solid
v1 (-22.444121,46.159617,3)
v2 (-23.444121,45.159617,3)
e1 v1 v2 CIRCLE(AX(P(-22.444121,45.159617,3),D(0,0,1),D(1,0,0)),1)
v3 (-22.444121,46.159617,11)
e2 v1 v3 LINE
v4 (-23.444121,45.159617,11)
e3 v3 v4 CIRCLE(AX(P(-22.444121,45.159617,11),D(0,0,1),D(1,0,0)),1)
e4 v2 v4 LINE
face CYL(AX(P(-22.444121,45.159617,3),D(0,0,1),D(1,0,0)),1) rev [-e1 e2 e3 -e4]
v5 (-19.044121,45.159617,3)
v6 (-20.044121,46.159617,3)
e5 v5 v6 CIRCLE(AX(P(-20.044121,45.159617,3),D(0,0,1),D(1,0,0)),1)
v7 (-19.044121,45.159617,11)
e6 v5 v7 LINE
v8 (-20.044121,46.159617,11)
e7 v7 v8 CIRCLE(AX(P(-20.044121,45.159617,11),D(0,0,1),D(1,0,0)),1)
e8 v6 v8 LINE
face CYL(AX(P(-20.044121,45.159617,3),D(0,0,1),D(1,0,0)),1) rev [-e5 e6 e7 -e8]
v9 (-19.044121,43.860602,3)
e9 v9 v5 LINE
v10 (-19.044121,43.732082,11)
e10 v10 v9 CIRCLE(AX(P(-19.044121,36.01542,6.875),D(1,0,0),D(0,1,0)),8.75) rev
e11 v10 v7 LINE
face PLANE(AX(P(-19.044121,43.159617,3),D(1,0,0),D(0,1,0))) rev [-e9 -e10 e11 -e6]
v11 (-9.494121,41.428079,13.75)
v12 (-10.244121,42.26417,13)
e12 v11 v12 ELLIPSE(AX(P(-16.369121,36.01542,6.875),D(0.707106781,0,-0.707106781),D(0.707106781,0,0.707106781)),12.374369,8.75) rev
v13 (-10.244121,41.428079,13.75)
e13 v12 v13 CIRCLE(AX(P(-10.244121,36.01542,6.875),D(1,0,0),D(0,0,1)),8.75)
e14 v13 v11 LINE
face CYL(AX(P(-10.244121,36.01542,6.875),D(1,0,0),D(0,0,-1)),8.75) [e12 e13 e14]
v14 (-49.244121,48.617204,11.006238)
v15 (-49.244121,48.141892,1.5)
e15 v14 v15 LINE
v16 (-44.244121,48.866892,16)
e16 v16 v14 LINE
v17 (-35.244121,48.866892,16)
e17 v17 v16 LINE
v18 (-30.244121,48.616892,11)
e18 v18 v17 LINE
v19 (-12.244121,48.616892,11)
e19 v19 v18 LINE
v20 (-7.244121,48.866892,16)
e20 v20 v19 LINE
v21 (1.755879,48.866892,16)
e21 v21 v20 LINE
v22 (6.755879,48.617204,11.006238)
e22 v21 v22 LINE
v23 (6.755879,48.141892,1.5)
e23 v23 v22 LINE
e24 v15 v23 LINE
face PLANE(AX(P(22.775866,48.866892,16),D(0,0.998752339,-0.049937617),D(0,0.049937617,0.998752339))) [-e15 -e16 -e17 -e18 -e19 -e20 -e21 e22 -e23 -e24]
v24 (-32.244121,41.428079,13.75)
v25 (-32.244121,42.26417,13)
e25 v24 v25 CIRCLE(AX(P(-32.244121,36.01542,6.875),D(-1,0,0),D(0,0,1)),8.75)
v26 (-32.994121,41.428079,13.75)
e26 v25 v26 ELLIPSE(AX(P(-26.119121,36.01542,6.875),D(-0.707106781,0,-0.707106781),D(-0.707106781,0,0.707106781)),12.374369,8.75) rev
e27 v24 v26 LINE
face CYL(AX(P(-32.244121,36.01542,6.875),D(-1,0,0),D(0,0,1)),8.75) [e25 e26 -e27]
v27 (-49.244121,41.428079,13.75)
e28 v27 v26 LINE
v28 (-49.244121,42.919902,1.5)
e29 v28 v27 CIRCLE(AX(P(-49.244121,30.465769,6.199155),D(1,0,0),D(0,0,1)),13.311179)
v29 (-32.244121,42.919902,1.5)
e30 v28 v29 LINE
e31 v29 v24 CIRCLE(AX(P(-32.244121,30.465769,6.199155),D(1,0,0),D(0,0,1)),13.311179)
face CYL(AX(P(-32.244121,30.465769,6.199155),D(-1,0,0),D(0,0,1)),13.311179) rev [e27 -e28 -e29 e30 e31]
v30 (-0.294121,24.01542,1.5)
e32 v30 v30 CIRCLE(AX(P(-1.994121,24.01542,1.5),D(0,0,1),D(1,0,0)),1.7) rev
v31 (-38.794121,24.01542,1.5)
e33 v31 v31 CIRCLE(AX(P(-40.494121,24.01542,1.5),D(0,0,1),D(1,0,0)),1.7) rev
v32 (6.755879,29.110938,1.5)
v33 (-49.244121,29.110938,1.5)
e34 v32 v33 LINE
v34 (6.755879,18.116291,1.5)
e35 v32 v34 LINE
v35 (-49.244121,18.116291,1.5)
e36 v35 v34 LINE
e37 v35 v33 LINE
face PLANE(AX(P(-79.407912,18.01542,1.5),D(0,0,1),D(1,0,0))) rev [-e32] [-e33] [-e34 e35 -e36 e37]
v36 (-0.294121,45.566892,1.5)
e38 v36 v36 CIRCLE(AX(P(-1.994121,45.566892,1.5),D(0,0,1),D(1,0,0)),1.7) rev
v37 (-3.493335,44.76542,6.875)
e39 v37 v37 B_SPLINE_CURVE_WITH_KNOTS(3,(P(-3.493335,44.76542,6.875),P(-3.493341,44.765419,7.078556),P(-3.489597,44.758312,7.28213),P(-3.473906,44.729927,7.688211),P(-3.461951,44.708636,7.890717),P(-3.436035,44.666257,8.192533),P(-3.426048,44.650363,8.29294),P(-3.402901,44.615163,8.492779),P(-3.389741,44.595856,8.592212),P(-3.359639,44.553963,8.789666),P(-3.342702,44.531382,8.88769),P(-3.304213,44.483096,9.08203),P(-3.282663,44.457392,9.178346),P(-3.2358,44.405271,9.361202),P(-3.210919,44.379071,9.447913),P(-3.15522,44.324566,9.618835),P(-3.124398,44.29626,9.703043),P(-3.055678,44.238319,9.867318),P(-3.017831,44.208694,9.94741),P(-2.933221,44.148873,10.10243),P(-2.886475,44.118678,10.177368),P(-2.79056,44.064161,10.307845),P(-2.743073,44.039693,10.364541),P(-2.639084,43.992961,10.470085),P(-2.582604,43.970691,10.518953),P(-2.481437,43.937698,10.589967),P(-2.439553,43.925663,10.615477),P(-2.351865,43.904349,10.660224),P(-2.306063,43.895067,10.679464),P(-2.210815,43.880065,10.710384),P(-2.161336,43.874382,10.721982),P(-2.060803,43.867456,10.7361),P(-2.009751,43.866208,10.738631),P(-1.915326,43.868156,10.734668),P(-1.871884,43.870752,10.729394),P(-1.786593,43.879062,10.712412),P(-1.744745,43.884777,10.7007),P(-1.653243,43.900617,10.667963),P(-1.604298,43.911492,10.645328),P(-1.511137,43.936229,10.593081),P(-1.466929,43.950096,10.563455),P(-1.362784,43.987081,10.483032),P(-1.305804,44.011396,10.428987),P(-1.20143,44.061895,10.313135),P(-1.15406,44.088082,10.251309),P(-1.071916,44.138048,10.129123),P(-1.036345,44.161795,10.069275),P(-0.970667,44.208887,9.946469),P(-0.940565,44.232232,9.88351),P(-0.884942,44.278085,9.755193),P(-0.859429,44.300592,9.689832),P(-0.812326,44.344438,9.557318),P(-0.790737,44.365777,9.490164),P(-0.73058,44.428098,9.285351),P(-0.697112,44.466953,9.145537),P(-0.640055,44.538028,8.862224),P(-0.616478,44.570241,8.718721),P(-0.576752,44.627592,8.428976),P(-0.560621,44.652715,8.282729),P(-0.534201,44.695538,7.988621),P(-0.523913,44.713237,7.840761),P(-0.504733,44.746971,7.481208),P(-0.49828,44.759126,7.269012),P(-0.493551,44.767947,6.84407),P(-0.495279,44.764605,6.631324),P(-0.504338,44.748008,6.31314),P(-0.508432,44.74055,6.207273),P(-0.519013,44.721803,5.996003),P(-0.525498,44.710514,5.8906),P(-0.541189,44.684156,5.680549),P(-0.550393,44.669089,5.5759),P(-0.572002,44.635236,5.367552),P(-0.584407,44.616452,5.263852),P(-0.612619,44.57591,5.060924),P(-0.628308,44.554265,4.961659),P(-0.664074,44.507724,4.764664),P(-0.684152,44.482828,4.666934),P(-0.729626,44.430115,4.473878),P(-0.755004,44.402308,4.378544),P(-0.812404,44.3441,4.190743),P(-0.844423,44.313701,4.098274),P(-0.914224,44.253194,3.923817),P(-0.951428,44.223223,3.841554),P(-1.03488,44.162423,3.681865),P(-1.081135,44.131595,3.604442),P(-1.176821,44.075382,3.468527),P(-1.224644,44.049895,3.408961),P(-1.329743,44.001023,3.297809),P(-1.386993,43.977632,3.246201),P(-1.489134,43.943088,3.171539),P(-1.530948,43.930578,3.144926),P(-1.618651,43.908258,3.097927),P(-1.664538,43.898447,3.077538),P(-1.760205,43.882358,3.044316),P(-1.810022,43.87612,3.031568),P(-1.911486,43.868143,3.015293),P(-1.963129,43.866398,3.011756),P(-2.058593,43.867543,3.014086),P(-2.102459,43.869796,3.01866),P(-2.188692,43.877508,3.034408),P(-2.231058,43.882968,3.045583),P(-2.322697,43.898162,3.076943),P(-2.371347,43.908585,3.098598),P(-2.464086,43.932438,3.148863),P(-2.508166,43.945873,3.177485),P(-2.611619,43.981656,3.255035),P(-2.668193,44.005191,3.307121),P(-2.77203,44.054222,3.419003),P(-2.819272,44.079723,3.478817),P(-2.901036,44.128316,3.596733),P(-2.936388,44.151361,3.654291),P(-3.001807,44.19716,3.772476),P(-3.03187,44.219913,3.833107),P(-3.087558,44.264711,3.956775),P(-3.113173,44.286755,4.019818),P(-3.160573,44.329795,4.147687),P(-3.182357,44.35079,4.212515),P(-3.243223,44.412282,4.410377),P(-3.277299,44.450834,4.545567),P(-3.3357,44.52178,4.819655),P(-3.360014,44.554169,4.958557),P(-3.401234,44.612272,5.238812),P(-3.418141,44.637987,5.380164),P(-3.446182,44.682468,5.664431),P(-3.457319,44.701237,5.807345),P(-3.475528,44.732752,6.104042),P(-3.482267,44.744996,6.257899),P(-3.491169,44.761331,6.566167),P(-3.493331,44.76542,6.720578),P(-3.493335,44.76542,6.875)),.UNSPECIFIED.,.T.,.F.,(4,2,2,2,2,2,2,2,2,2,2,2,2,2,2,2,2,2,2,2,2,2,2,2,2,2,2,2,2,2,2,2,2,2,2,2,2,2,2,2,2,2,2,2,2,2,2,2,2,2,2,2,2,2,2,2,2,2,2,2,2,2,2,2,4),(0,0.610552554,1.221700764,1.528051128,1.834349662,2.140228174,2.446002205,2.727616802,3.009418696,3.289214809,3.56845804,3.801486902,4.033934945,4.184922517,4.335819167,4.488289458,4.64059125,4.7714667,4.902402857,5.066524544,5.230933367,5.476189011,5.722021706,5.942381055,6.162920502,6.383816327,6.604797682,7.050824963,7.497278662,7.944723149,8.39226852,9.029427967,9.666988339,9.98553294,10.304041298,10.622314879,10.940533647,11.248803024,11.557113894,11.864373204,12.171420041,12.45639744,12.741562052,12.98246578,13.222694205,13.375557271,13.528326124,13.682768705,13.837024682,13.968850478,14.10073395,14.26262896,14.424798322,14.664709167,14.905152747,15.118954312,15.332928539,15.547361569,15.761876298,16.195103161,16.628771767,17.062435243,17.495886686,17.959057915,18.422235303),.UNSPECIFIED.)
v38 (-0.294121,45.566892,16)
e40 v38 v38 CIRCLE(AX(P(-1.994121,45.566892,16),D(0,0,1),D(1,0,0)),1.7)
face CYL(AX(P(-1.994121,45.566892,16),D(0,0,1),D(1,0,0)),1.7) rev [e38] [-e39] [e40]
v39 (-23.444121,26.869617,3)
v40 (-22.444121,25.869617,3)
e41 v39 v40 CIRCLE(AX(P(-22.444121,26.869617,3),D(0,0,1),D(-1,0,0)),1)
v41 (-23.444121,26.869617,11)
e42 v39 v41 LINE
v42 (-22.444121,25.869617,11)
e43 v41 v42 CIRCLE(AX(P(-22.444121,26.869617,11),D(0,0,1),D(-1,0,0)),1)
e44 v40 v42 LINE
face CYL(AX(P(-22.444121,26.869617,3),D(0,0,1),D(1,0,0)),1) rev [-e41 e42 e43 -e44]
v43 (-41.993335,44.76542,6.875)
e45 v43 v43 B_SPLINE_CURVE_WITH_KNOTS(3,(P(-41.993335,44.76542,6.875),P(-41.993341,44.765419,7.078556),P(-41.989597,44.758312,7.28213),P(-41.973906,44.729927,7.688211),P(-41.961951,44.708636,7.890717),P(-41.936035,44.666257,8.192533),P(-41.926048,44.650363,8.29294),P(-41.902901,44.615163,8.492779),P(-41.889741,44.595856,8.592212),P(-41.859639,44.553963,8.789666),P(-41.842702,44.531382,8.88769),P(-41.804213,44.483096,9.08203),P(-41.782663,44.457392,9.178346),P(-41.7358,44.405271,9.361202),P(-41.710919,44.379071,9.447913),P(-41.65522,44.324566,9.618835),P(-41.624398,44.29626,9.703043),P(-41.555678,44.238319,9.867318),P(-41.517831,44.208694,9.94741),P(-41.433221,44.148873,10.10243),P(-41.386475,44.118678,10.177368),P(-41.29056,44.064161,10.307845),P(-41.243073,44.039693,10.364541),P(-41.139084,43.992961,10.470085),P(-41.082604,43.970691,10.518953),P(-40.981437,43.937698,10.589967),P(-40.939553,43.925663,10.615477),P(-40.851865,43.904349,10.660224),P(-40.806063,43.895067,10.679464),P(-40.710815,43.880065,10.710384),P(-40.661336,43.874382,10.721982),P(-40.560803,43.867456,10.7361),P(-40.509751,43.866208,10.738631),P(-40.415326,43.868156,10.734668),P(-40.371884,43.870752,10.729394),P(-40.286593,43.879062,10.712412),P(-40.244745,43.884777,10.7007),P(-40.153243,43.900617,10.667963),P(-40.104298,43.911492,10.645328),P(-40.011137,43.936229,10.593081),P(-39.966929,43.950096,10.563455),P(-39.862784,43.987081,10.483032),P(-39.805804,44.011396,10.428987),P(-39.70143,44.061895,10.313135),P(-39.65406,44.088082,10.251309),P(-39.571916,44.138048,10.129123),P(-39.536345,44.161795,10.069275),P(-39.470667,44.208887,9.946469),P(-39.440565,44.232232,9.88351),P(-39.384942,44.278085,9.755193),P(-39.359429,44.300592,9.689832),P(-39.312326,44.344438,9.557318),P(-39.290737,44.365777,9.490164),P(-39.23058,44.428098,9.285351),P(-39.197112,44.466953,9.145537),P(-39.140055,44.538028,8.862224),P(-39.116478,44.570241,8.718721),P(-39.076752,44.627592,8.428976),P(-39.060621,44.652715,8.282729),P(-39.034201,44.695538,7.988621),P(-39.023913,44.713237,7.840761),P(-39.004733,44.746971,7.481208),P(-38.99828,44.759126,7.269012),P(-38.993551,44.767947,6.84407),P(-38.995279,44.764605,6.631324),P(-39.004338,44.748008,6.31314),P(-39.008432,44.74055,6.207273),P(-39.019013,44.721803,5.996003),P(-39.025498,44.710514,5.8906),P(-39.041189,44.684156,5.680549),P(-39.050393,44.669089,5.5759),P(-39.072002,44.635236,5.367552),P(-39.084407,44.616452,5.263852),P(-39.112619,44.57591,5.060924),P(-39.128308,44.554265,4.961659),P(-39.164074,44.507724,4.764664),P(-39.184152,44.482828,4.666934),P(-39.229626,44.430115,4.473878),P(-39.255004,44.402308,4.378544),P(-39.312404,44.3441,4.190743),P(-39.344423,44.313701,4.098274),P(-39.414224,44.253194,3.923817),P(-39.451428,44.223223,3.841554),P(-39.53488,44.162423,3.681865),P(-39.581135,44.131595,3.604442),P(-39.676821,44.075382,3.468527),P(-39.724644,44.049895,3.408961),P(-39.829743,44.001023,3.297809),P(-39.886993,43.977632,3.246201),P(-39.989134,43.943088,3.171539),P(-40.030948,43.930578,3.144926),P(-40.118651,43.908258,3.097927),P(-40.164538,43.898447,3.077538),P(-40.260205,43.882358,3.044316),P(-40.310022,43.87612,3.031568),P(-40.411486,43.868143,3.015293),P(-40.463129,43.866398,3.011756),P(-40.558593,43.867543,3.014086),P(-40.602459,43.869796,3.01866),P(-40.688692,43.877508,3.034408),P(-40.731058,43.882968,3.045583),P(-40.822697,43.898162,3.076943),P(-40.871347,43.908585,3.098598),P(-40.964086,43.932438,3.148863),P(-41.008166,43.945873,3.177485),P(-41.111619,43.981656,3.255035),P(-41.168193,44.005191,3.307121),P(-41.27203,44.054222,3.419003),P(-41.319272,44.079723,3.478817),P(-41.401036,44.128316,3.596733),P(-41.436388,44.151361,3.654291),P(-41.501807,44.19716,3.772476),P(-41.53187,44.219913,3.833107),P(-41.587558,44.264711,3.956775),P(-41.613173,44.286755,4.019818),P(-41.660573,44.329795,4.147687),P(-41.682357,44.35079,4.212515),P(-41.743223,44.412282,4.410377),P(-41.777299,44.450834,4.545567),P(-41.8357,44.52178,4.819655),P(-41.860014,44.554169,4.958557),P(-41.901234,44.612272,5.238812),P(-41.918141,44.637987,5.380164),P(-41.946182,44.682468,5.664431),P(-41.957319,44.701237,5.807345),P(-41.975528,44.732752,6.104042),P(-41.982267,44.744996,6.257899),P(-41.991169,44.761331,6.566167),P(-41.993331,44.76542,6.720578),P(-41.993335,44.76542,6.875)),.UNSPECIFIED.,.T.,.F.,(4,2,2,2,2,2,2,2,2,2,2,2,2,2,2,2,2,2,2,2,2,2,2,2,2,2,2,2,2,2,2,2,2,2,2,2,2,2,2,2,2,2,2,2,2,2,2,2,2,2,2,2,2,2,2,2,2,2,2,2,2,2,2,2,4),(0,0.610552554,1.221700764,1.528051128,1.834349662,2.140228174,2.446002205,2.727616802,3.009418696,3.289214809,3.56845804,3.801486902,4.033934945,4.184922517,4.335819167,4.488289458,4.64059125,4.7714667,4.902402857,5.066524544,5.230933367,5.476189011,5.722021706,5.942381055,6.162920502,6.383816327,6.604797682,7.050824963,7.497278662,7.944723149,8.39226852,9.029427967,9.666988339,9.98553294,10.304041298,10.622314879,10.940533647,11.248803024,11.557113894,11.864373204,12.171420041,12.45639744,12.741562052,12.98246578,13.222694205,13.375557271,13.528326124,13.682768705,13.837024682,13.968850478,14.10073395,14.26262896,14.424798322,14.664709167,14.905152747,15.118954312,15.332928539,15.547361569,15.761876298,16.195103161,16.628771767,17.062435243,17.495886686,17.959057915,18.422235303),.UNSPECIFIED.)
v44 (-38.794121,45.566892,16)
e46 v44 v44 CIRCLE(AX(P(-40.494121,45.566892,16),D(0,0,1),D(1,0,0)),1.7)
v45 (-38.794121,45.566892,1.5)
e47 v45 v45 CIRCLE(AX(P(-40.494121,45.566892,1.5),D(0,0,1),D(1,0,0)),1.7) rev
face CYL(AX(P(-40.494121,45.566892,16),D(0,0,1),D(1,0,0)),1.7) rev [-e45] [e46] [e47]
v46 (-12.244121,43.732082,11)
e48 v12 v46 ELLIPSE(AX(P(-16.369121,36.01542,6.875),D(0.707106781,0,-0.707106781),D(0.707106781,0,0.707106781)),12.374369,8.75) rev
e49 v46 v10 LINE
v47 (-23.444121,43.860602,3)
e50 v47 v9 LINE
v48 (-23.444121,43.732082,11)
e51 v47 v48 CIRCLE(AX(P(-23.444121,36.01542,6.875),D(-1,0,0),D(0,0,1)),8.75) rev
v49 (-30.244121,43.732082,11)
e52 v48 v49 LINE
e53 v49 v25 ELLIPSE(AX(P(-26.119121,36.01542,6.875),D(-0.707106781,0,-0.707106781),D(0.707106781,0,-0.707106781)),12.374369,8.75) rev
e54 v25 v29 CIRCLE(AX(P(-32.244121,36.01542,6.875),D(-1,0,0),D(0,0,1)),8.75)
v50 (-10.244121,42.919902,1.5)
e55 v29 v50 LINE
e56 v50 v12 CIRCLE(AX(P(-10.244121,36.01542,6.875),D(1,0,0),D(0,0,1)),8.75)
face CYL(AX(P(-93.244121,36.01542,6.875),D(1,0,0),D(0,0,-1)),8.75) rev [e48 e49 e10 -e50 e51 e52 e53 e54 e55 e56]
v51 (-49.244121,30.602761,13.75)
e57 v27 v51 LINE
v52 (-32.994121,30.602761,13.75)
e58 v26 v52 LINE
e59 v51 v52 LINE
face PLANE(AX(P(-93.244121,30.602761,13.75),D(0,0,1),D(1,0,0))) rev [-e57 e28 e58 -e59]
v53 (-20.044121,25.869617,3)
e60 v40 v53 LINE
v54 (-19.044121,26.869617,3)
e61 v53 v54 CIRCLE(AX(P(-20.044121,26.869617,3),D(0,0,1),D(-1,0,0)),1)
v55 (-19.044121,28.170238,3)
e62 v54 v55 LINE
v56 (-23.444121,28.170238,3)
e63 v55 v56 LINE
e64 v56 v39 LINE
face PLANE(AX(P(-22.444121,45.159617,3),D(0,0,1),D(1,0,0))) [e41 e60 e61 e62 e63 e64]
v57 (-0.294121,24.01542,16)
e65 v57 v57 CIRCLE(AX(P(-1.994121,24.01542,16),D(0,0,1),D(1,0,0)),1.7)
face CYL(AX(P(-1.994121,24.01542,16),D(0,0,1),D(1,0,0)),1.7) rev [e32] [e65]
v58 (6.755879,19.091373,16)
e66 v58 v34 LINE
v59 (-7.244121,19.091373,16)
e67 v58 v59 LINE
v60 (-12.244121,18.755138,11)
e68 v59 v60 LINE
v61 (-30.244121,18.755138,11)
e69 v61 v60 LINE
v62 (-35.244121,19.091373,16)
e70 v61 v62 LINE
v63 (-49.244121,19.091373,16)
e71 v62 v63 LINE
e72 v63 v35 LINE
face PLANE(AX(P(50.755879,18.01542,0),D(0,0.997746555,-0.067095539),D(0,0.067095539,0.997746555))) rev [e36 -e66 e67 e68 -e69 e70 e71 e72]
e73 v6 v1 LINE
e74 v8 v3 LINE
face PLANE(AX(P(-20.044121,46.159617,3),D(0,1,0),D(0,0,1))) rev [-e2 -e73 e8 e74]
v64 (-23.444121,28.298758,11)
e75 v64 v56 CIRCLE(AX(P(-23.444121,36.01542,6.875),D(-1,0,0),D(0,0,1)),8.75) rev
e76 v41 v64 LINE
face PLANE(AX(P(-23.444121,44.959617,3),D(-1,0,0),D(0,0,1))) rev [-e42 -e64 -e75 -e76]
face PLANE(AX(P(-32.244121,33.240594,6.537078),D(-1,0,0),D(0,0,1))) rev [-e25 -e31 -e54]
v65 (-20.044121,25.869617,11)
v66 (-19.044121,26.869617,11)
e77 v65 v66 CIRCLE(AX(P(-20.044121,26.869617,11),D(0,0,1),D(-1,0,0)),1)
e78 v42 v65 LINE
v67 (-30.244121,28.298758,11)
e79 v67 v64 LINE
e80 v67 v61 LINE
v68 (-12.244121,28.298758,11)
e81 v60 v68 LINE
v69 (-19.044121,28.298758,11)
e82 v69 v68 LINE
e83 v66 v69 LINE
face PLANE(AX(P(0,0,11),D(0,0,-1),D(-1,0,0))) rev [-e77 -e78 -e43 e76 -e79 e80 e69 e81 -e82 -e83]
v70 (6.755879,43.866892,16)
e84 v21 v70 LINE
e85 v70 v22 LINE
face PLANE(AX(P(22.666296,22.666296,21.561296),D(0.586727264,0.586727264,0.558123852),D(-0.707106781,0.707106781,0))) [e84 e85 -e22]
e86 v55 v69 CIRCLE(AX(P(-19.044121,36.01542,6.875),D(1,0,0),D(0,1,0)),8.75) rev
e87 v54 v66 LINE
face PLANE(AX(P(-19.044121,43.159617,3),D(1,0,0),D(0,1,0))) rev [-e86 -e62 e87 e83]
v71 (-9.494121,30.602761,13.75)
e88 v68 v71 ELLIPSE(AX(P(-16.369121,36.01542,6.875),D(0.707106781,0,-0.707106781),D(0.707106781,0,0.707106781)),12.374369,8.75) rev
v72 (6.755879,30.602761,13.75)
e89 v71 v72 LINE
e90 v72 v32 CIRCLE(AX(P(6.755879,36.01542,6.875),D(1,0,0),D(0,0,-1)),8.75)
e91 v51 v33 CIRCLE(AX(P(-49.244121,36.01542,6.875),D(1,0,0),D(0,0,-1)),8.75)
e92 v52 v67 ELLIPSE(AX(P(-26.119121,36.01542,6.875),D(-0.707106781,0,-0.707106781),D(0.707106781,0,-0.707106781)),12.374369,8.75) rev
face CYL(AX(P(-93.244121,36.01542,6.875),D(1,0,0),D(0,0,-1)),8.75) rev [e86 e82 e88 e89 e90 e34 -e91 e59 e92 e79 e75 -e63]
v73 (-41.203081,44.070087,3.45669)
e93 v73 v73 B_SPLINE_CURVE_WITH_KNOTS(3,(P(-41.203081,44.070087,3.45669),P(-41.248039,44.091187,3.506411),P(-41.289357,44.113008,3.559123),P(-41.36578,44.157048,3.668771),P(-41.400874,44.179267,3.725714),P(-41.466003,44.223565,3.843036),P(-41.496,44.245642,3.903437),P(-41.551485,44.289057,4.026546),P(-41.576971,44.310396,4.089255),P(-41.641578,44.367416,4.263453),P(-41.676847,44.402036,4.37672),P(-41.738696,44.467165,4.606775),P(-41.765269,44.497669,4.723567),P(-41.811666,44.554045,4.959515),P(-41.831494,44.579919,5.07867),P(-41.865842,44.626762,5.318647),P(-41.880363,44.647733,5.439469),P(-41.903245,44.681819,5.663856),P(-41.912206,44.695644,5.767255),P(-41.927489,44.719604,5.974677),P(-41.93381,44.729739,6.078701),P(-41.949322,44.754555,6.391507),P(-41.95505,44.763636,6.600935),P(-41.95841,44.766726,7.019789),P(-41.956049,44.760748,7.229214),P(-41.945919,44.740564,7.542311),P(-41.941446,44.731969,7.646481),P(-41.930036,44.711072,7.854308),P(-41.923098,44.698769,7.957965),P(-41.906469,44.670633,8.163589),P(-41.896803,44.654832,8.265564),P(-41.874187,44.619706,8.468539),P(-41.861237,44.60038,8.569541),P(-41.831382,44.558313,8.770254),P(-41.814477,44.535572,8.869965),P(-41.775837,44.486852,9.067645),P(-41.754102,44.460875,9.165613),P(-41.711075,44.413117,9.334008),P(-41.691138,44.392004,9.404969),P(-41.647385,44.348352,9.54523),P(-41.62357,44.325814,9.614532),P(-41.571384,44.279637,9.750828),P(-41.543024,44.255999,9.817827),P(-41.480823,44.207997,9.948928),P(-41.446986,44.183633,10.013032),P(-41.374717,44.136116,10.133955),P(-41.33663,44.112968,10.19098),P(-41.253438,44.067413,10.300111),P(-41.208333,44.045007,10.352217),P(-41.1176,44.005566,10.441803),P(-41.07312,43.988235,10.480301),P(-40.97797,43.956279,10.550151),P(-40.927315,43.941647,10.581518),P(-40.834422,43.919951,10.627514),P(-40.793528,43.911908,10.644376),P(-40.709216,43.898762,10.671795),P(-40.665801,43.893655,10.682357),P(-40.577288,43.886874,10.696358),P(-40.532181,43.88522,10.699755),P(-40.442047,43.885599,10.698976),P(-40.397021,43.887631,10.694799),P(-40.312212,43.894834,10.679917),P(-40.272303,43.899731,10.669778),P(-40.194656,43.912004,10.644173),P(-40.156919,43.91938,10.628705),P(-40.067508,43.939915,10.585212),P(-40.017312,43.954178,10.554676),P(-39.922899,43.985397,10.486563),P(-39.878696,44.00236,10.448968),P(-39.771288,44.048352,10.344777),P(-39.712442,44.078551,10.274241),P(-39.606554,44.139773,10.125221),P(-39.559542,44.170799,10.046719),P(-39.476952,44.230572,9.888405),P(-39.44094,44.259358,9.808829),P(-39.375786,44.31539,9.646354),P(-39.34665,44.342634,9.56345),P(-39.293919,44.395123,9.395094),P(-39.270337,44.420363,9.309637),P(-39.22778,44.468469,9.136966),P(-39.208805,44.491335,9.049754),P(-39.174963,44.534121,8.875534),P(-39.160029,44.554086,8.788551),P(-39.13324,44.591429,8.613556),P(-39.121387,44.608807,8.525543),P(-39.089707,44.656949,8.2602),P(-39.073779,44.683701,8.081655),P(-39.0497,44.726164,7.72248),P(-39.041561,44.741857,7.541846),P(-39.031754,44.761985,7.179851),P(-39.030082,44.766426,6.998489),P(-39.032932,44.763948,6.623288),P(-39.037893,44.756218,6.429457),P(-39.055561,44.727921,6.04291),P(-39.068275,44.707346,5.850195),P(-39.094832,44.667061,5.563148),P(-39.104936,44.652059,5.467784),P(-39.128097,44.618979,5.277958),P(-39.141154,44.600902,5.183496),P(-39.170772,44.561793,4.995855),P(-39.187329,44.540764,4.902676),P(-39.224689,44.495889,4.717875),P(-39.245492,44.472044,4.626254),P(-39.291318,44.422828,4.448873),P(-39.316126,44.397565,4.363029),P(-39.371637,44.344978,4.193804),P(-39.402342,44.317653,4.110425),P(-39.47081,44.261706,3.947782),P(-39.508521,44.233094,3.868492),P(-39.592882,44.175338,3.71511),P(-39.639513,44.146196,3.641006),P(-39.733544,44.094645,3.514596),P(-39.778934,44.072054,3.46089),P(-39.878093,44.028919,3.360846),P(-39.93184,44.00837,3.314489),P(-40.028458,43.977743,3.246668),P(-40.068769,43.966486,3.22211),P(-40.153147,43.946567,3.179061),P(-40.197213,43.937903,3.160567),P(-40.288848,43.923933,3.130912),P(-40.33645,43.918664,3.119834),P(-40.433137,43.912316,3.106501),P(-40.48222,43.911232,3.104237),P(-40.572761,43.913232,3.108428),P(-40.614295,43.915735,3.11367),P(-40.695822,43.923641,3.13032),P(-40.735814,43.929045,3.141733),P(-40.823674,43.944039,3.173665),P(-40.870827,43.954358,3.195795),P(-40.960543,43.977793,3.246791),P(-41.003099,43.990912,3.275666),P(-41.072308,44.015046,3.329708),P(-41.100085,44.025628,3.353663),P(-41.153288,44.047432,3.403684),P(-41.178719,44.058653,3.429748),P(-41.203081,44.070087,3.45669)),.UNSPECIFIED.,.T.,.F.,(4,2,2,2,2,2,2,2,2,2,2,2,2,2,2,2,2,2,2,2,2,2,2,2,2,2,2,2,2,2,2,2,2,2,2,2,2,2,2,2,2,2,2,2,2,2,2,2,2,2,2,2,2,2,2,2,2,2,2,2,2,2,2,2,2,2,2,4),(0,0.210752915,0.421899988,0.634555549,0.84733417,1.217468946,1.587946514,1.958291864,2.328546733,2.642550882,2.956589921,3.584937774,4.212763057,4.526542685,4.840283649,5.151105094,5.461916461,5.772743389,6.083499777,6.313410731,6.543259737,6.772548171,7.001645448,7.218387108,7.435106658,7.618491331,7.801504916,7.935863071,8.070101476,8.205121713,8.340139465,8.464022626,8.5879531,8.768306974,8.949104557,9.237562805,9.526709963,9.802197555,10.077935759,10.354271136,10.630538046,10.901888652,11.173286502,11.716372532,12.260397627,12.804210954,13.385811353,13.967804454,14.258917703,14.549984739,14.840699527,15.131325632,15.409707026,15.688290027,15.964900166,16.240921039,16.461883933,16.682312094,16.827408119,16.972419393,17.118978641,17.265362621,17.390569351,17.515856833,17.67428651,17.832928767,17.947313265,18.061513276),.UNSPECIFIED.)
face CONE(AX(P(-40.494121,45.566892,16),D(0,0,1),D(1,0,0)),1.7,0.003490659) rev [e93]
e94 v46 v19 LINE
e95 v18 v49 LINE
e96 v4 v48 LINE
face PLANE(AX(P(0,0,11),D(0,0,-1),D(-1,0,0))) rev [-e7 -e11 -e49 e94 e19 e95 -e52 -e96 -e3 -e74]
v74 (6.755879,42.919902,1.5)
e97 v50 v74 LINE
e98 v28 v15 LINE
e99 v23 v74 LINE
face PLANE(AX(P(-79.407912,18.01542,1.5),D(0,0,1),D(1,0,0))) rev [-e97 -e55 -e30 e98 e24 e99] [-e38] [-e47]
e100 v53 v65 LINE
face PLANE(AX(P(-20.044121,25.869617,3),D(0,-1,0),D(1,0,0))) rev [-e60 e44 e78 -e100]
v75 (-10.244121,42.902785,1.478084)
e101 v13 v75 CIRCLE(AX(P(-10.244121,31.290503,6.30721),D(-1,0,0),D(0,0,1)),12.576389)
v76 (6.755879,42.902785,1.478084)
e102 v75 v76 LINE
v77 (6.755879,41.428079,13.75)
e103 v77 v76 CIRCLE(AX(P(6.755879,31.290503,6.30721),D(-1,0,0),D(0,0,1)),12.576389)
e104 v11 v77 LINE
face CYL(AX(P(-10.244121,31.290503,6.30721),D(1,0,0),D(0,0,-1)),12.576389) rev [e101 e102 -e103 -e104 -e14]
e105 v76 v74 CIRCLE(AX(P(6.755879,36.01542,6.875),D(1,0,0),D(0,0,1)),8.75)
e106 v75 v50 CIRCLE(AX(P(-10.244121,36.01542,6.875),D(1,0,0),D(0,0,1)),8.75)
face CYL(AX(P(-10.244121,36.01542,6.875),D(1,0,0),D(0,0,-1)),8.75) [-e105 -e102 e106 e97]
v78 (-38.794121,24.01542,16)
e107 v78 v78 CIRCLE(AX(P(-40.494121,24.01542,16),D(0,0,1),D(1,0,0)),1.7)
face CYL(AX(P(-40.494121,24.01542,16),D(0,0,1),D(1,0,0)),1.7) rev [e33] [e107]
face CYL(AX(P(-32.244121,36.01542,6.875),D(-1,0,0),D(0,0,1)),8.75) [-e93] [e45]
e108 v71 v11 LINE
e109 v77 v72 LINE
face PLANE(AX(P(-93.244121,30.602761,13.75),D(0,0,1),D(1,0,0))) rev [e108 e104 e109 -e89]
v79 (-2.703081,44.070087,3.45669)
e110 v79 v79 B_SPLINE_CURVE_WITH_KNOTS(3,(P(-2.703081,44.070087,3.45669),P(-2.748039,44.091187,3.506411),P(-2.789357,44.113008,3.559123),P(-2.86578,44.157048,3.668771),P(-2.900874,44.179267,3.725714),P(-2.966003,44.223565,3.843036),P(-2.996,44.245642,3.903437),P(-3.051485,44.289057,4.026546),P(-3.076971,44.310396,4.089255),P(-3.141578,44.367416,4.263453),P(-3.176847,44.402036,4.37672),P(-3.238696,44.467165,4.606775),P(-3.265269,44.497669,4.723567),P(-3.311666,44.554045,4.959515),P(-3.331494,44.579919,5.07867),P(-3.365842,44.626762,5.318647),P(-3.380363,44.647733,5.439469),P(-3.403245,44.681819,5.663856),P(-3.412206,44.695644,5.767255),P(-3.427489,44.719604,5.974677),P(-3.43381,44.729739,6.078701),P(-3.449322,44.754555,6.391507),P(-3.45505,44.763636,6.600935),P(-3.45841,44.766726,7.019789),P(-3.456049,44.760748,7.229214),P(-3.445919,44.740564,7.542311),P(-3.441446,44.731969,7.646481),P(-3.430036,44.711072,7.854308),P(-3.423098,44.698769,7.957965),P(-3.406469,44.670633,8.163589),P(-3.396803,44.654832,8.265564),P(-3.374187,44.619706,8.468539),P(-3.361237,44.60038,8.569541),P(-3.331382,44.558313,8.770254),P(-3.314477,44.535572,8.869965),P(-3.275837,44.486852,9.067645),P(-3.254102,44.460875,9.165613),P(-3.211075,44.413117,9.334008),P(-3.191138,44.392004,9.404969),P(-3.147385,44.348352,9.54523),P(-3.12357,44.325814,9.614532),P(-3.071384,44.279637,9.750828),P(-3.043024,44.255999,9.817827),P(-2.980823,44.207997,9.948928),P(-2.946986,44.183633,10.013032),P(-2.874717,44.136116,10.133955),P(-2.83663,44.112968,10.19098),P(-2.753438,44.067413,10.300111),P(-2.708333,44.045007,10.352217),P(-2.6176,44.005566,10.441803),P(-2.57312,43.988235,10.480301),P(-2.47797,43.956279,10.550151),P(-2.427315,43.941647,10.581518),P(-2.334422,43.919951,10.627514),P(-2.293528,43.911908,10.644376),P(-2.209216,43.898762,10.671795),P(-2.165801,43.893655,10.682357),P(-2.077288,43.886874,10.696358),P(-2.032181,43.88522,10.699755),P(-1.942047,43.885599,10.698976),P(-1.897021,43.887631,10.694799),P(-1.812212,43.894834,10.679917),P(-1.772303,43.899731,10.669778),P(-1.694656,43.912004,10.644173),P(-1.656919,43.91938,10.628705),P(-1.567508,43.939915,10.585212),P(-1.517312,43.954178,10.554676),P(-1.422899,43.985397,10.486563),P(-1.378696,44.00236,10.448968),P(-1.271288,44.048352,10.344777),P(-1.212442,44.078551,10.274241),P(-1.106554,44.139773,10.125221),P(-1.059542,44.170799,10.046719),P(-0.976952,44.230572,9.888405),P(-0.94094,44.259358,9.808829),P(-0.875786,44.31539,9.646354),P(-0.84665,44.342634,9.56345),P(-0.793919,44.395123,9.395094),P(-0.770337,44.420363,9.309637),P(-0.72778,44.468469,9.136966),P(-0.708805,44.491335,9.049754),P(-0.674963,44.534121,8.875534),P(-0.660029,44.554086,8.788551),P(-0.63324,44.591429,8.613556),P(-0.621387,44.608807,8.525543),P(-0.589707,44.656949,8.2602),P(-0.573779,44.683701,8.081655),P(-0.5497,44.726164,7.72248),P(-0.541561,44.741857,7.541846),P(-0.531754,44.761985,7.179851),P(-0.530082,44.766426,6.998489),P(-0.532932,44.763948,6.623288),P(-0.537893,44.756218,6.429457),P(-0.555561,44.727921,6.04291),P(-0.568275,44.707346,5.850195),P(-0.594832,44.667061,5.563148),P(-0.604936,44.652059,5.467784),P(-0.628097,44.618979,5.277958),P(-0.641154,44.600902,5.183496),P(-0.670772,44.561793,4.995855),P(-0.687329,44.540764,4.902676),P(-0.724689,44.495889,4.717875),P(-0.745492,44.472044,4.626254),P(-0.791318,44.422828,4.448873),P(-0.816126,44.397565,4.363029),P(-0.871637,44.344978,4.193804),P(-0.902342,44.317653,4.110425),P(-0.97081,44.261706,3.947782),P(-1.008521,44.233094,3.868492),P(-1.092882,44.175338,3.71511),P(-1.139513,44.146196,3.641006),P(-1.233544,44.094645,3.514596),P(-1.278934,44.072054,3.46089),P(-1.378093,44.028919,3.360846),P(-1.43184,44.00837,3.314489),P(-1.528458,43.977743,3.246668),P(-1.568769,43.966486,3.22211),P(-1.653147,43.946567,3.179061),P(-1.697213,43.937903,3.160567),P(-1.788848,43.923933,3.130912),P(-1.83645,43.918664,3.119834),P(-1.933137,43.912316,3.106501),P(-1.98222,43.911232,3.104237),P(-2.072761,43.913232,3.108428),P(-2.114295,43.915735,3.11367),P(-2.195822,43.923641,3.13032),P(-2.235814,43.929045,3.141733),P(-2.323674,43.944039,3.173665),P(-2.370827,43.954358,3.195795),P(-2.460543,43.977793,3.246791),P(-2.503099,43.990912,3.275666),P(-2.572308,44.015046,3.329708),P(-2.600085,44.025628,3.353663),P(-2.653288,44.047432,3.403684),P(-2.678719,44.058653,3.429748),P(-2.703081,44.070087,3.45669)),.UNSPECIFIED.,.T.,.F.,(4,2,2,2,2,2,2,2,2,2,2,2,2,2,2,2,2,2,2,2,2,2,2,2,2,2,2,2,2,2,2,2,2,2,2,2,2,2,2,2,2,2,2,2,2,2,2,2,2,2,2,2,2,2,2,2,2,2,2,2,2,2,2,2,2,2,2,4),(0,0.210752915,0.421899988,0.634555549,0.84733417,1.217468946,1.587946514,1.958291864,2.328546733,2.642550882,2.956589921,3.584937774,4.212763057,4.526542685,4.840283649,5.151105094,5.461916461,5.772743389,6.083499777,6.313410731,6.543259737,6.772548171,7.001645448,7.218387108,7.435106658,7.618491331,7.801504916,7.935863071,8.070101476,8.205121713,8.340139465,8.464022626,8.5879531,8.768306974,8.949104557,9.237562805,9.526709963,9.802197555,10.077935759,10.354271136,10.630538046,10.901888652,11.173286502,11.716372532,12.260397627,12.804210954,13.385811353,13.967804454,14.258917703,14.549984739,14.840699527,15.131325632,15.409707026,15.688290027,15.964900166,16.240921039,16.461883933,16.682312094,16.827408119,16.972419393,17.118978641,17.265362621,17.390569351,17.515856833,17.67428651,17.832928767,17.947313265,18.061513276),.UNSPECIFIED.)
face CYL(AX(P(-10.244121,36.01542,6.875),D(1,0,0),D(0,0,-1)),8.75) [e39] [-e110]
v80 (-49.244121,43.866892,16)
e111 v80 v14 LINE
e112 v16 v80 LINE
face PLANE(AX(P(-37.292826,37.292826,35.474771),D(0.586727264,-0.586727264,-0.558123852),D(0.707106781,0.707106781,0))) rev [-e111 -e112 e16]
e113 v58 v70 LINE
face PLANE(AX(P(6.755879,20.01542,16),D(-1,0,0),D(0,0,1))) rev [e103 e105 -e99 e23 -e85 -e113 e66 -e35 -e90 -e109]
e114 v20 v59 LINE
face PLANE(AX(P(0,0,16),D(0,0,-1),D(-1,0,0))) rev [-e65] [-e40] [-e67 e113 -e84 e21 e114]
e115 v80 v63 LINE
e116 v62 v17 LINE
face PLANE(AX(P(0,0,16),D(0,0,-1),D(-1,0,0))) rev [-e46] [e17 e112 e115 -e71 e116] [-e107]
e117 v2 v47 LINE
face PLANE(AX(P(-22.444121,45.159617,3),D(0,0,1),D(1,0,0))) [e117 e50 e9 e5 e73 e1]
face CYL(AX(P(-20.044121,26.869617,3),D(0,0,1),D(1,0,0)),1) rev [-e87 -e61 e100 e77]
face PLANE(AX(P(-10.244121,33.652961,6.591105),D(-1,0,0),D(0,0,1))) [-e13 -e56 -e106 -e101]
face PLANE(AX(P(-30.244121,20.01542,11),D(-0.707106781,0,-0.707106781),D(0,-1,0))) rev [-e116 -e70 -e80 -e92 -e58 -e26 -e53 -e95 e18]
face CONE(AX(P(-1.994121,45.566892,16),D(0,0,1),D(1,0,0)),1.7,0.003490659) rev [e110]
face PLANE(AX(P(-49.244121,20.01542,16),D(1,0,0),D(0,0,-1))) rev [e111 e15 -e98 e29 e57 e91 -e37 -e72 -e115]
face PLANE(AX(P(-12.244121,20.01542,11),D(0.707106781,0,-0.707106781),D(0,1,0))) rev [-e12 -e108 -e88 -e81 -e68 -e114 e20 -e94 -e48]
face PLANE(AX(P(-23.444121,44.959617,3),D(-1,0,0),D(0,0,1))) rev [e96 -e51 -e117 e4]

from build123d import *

# Parameters (mm, degrees)
ESBO_O1_W                        = 56
ESBO_O1_H                        = 28.051471863
RESSALTO_EXTRUS_O1_DEPTH         = 16
CORTE_EXTRUS_O1_DEPTH            = 100
ESBO_O3_W                        = 18
ESBO_O3_H                        = 28.051471863
CORTE_EXTRUS_O2_DEPTH            = 5
FURO_COM_FOLGA_DE_M32_D          = 3.4
FURO_COM_FOLGA_DE_M34_D          = 3.4
CHANFRO1_SIZE                    = 5
CORTE_EXTRUS_O3_DEPTH            = 8
RESSALTO_EXTRUS_O3_DEPTH         = 56
CORTE_EXTRUS_O4_DEPTH            = 100
CHANFRO2_START                   = 38.631741411
CHANFRO2_OUTLINE_W               = 9
CHANFRO2_OUTLINE_H               = 10
CHANFRO2_DEPTH                   = 4.368258589
CHANFRO3_START                   = -67
CHANFRO3_OUTLINE_W               = 9
CHANFRO3_OUTLINE_H               = 10
CHANFRO3_DEPTH                   = 3.439248526
RESSALTO_EXTRUS_O4_DEPTH         = 2
CORTE_EXTRUS_O5_DEPTH            = 100
CORTE_EXTRUS_O6_START            = -56
ESBO_O24_W                       = 1.5
ESBO_O24_H                       = 30.126471863
CORTE_EXTRUS_O6_DEPTH            = 56
RESSALTO_EXTRUS_O6_DEPTH         = 17
RESSALTO_EXTRUS_O7_START         = -17
RESSALTO_EXTRUS_O7_DEPTH         = 17
ESBO_O29_R                       = 1.7
CORTE_EXTRUS_O16_DEPTH           = 17
CORTE_EXTRUS_O16_DRAFT           = -0.2
CORTE_EXTRUS_O16_PROFILE_2_DEPTH = 17
CORTE_EXTRUS_O16_PROFILE_2_DRAFT = -0.2


with BuildPart() as part:
    # Esboço1 → Ressalto-extrusão1 (new body)
    with BuildSketch(Plane.XY):
        with Locations((-21.244121058, 34.04115584)):
            Rectangle(ESBO_O1_W, ESBO_O1_H)
    extrude(amount=RESSALTO_EXTRUS_O1_DEPTH)

    # Esboço2 → Corte-extrusão1 (cut)
    with BuildSketch(Plane(origin=(6.755878942, 0, 0), x_dir=(0, 0, -1), z_dir=(1, 0, 0))):
        with BuildLine():
            Line((0, 41.428078682), (0, 30.602761135))
            ThreePointArc((0, 30.602761135), (-6.875, 27.265419908), (-13.75, 30.602761135))
            Line((-13.75, 30.602761135), (-13.75, 41.428078682))
            ThreePointArc((-13.75, 41.428078682), (-6.875, 44.765419908), (0, 41.428078682))
        make_face()
    extrude(amount=-CORTE_EXTRUS_O1_DEPTH, mode=Mode.SUBTRACT)

    # Esboço3 → Corte-extrusão2 (cut)
    with BuildSketch(Plane.XY.offset(16)):
        with Locations((-21.244121058, 34.04115584)):
            Rectangle(ESBO_O3_W, ESBO_O3_H)
    extrude(amount=-CORTE_EXTRUS_O2_DEPTH, mode=Mode.SUBTRACT)

    # Furo com folga de M32 (through all)
    with Locations(Plane.XY.offset(16)):
        with Locations((-1.994121058, 45.566891771), (-40.494121058, 45.566891771)):
            Hole(FURO_COM_FOLGA_DE_M32_D / 2)

    # Furo com folga de M34 (through all)
    with Locations(Plane.XY.offset(16)):
        with Locations((-1.994121058, 24.015419908), (-40.494121058, 24.015419908)):
            Hole(FURO_COM_FOLGA_DE_M34_D / 2)

    # Chanfro1
    # the kernel refuses this chamfer: 5 mm, written as the material it takes off along each edge
    with BuildSketch(Plane(origin=(-12.244121058, 7.157004969, 16), x_dir=(1, 0, 0), z_dir=(0, 1, 0))) as chanfro1_piece_1:
        Polygon((CHANFRO1_SIZE, 0), (0, CHANFRO1_SIZE), (0, 0), align=None)
    extrude(amount=53.768301742, mode=Mode.SUBTRACT)
    with BuildSketch(Plane(origin=(-30.244121058, 60.925306711, 16), x_dir=(0, 0, -1), z_dir=(0, -1, 0))) as chanfro1_piece_2:
        Polygon((CHANFRO1_SIZE, 0), (0, -CHANFRO1_SIZE), (0, 0), align=None)
    extrude(amount=53.768301742, mode=Mode.SUBTRACT)

    # Esboço17 → Corte-extrusão3 (cut)
    with BuildSketch(Plane.XY.offset(11)):
        with BuildLine():
            Line((-20.044121058, 25.869616944), (-22.444121058, 25.869616944))
            ThreePointArc((-22.444121058, 25.869616944), (-23.151227839, 26.162510163), (-23.444121058, 26.869616944))
            Line((-23.444121058, 26.869616944), (-23.444121058, 27.069616944))
            Line((-23.444121058, 27.069616944), (-23.444121058, 44.959616944))
            Line((-23.444121058, 44.959616944), (-23.444121058, 45.159616944))
            ThreePointArc((-23.444121058, 45.159616944), (-23.151227839, 45.866723726), (-22.444121058, 46.159616944))
            Line((-22.444121058, 46.159616944), (-20.044121058, 46.159616944))
            ThreePointArc((-20.044121058, 46.159616944), (-19.337014277, 45.866723726), (-19.044121058, 45.159616944))
            Line((-19.044121058, 45.159616944), (-19.044121058, 43.159616944))
            Line((-19.044121058, 43.159616944), (-19.044121058, 36.014616944))
            Line((-19.044121058, 36.014616944), (-19.044121058, 26.869616944))
            ThreePointArc((-19.044121058, 26.869616944), (-19.337014277, 26.162510163), (-20.044121058, 25.869616944))
        make_face()
    extrude(amount=-CORTE_EXTRUS_O3_DEPTH, mode=Mode.SUBTRACT)

    # Esboço20 → Ressalto-extrusão3 (add)
    with BuildSketch(Plane.ZY.offset(49.244121058)):
        Polygon((0, 48.066891771), (16, 48.066891771), (16, 48.866891771), align=None)
    extrude(amount=-RESSALTO_EXTRUS_O3_DEPTH)

    # Esboço21 → Corte-extrusão4 (cut)
    with BuildSketch(Plane.XZ.offset(-48.066891771)):
        Polygon((-7.244121058, 16), (-12.244121058, 11), (-30.244121058, 11), (-35.244121058, 16), align=None)
    extrude(amount=-CORTE_EXTRUS_O4_DEPTH, mode=Mode.SUBTRACT)

    # Chanfro2: read off the stored shape, not the designer's step
    # Chanfro2 outline → Chanfro2 (cut)
    with BuildSketch(Plane(origin=(0, 0, 0), x_dir=(0.8097846116702572, -0.42511166270745215, -0.4043871374464777), z_dir=(0.586727264324789, 0.58672726432479, 0.558123852380363)).offset(CHANFRO2_START)):
        with Locations((-22.5, 22)):
            Rectangle(CHANFRO2_OUTLINE_W, CHANFRO2_OUTLINE_H)
    extrude(amount=CHANFRO2_DEPTH, mode=Mode.SUBTRACT)

    # Chanfro3: read off the stored shape, not the designer's step
    # Chanfro3 outline → Chanfro3 (cut)
    with BuildSketch(Plane(origin=(0, 0, 0), x_dir=(0.8097846116702566, 0.4251116627074525, 0.404387137446478), z_dir=(0.5867272643247896, -0.5867272643247896, -0.5581238523803627)).offset(CHANFRO3_START)):
        with Locations((-11.5, -22)):
            Rectangle(CHANFRO3_OUTLINE_W, CHANFRO3_OUTLINE_H)
    extrude(amount=CHANFRO3_DEPTH, mode=Mode.SUBTRACT)

    # Esboço22 → Ressalto-extrusão4 (add)
    with BuildSketch(Plane.XZ.offset(-20.015419908)):
        Polygon((-49.244121058, 16), (-35.244121058, 16), (-30.244121058, 11), (-12.244121058, 11), (-7.244121058, 16), (6.755878942, 16), (6.755878942, 0), (-49.244121058, 0), align=None)
    extrude(amount=RESSALTO_EXTRUS_O4_DEPTH)

    # Esboço23 → Corte-extrusão5 (cut)
    with BuildSketch(Plane.ZY.offset(49.244121058)):
        Polygon((0, 18.015419908), (16, 19.091373139), (16, 18.015419908), align=None)
    extrude(amount=-CORTE_EXTRUS_O5_DEPTH, mode=Mode.SUBTRACT)

    # Esboço24 → Corte-extrusão6 (cut)
    with BuildSketch(Plane(origin=(6.755878942, 0, 0), x_dir=(0, 0, -1), z_dir=(1, 0, 0)).offset(CORTE_EXTRUS_O6_START)):
        with Locations((-0.75, 33.07865584)):
            Rectangle(ESBO_O24_W, ESBO_O24_H)
    extrude(amount=CORTE_EXTRUS_O6_DEPTH, mode=Mode.SUBTRACT)

    # Esboço26 → Ressalto-extrusão6 (add)
    with BuildSketch(Plane(origin=(6.755878942, 0, 0), x_dir=(0, 0, -1), z_dir=(1, 0, 0))):
        with BuildLine():
            ThreePointArc((-13.75, 41.428078682), (-7.807709843, 43.777058017), (-1.47808403, 42.902785008))
            ThreePointArc((-1.47808403, 42.902785008), (-7.918969725, 44.702918237), (-13.75, 41.428078682))
        make_face()
    extrude(amount=-RESSALTO_EXTRUS_O6_DEPTH)

    # Esboço28 → Ressalto-extrusão7 (add)
    with BuildSketch(Plane.ZY.offset(49.244121058).offset(RESSALTO_EXTRUS_O7_START)):
        with BuildLine():
            ThreePointArc((13.75, 41.428078682), (7.932773281, 44.701248348), (1.5, 42.919902148))
            ThreePointArc((1.5, 42.919902148), (7.808321968, 43.679325435), (13.75, 41.428078682))
        make_face()
    extrude(amount=RESSALTO_EXTRUS_O7_DEPTH)


with BuildPart() as corte_extrus_o16_tool:
    # Esboço29 → Corte-extrusão16 (with draft: the straight prism first)
    with BuildSketch(Plane.XY.offset(16)):
        with Locations((-40.494121058, 45.566891771)):
            Circle(ESBO_O29_R)
    extrude(amount=-CORTE_EXTRUS_O16_DEPTH)
    # Corte-extrusão16: the draft: its side faces are tilted about the plane it starts from
    corte_extrus_o16_sides = [corte_extrus_o16_tool.faces().sort_by_distance(p)[0] for p in [
        (-42.194121058, 45.566891771, 7.5),
    ]]
    draft(corte_extrus_o16_sides, Plane.XY.offset(16), CORTE_EXTRUS_O16_DRAFT)


with BuildPart() as part_1:
    add(part.part)

    # Corte-extrusão16: cut by corte_extrus_o16_tool
    add(corte_extrus_o16_tool.part, mode=Mode.SUBTRACT)


with BuildPart() as corte_extrus_o16_profile_2_tool:
    # Esboço29 → Corte-extrusão16 profile 2 (with draft: the straight prism first)
    with BuildSketch(Plane.XY.offset(16)):
        with Locations((-1.994121058, 45.566891771)):
            Circle(ESBO_O29_R)
    extrude(amount=-CORTE_EXTRUS_O16_PROFILE_2_DEPTH)
    # Corte-extrusão16 profile 2: the draft: its side faces are tilted about the plane it starts from
    corte_extrus_o16_profile_2_sides = [corte_extrus_o16_profile_2_tool.faces().sort_by_distance(p)[0] for p in [
        (-3.694121058, 45.566891771, 7.5),
    ]]
    draft(corte_extrus_o16_profile_2_sides, Plane.XY.offset(16), CORTE_EXTRUS_O16_PROFILE_2_DRAFT)


with BuildPart() as part_2:
    add(part_1.part)

    # Corte-extrusão16 profile 2: cut by corte_extrus_o16_profile_2_tool
    add(corte_extrus_o16_profile_2_tool.part, mode=Mode.SUBTRACT)


solid = part_2.part
